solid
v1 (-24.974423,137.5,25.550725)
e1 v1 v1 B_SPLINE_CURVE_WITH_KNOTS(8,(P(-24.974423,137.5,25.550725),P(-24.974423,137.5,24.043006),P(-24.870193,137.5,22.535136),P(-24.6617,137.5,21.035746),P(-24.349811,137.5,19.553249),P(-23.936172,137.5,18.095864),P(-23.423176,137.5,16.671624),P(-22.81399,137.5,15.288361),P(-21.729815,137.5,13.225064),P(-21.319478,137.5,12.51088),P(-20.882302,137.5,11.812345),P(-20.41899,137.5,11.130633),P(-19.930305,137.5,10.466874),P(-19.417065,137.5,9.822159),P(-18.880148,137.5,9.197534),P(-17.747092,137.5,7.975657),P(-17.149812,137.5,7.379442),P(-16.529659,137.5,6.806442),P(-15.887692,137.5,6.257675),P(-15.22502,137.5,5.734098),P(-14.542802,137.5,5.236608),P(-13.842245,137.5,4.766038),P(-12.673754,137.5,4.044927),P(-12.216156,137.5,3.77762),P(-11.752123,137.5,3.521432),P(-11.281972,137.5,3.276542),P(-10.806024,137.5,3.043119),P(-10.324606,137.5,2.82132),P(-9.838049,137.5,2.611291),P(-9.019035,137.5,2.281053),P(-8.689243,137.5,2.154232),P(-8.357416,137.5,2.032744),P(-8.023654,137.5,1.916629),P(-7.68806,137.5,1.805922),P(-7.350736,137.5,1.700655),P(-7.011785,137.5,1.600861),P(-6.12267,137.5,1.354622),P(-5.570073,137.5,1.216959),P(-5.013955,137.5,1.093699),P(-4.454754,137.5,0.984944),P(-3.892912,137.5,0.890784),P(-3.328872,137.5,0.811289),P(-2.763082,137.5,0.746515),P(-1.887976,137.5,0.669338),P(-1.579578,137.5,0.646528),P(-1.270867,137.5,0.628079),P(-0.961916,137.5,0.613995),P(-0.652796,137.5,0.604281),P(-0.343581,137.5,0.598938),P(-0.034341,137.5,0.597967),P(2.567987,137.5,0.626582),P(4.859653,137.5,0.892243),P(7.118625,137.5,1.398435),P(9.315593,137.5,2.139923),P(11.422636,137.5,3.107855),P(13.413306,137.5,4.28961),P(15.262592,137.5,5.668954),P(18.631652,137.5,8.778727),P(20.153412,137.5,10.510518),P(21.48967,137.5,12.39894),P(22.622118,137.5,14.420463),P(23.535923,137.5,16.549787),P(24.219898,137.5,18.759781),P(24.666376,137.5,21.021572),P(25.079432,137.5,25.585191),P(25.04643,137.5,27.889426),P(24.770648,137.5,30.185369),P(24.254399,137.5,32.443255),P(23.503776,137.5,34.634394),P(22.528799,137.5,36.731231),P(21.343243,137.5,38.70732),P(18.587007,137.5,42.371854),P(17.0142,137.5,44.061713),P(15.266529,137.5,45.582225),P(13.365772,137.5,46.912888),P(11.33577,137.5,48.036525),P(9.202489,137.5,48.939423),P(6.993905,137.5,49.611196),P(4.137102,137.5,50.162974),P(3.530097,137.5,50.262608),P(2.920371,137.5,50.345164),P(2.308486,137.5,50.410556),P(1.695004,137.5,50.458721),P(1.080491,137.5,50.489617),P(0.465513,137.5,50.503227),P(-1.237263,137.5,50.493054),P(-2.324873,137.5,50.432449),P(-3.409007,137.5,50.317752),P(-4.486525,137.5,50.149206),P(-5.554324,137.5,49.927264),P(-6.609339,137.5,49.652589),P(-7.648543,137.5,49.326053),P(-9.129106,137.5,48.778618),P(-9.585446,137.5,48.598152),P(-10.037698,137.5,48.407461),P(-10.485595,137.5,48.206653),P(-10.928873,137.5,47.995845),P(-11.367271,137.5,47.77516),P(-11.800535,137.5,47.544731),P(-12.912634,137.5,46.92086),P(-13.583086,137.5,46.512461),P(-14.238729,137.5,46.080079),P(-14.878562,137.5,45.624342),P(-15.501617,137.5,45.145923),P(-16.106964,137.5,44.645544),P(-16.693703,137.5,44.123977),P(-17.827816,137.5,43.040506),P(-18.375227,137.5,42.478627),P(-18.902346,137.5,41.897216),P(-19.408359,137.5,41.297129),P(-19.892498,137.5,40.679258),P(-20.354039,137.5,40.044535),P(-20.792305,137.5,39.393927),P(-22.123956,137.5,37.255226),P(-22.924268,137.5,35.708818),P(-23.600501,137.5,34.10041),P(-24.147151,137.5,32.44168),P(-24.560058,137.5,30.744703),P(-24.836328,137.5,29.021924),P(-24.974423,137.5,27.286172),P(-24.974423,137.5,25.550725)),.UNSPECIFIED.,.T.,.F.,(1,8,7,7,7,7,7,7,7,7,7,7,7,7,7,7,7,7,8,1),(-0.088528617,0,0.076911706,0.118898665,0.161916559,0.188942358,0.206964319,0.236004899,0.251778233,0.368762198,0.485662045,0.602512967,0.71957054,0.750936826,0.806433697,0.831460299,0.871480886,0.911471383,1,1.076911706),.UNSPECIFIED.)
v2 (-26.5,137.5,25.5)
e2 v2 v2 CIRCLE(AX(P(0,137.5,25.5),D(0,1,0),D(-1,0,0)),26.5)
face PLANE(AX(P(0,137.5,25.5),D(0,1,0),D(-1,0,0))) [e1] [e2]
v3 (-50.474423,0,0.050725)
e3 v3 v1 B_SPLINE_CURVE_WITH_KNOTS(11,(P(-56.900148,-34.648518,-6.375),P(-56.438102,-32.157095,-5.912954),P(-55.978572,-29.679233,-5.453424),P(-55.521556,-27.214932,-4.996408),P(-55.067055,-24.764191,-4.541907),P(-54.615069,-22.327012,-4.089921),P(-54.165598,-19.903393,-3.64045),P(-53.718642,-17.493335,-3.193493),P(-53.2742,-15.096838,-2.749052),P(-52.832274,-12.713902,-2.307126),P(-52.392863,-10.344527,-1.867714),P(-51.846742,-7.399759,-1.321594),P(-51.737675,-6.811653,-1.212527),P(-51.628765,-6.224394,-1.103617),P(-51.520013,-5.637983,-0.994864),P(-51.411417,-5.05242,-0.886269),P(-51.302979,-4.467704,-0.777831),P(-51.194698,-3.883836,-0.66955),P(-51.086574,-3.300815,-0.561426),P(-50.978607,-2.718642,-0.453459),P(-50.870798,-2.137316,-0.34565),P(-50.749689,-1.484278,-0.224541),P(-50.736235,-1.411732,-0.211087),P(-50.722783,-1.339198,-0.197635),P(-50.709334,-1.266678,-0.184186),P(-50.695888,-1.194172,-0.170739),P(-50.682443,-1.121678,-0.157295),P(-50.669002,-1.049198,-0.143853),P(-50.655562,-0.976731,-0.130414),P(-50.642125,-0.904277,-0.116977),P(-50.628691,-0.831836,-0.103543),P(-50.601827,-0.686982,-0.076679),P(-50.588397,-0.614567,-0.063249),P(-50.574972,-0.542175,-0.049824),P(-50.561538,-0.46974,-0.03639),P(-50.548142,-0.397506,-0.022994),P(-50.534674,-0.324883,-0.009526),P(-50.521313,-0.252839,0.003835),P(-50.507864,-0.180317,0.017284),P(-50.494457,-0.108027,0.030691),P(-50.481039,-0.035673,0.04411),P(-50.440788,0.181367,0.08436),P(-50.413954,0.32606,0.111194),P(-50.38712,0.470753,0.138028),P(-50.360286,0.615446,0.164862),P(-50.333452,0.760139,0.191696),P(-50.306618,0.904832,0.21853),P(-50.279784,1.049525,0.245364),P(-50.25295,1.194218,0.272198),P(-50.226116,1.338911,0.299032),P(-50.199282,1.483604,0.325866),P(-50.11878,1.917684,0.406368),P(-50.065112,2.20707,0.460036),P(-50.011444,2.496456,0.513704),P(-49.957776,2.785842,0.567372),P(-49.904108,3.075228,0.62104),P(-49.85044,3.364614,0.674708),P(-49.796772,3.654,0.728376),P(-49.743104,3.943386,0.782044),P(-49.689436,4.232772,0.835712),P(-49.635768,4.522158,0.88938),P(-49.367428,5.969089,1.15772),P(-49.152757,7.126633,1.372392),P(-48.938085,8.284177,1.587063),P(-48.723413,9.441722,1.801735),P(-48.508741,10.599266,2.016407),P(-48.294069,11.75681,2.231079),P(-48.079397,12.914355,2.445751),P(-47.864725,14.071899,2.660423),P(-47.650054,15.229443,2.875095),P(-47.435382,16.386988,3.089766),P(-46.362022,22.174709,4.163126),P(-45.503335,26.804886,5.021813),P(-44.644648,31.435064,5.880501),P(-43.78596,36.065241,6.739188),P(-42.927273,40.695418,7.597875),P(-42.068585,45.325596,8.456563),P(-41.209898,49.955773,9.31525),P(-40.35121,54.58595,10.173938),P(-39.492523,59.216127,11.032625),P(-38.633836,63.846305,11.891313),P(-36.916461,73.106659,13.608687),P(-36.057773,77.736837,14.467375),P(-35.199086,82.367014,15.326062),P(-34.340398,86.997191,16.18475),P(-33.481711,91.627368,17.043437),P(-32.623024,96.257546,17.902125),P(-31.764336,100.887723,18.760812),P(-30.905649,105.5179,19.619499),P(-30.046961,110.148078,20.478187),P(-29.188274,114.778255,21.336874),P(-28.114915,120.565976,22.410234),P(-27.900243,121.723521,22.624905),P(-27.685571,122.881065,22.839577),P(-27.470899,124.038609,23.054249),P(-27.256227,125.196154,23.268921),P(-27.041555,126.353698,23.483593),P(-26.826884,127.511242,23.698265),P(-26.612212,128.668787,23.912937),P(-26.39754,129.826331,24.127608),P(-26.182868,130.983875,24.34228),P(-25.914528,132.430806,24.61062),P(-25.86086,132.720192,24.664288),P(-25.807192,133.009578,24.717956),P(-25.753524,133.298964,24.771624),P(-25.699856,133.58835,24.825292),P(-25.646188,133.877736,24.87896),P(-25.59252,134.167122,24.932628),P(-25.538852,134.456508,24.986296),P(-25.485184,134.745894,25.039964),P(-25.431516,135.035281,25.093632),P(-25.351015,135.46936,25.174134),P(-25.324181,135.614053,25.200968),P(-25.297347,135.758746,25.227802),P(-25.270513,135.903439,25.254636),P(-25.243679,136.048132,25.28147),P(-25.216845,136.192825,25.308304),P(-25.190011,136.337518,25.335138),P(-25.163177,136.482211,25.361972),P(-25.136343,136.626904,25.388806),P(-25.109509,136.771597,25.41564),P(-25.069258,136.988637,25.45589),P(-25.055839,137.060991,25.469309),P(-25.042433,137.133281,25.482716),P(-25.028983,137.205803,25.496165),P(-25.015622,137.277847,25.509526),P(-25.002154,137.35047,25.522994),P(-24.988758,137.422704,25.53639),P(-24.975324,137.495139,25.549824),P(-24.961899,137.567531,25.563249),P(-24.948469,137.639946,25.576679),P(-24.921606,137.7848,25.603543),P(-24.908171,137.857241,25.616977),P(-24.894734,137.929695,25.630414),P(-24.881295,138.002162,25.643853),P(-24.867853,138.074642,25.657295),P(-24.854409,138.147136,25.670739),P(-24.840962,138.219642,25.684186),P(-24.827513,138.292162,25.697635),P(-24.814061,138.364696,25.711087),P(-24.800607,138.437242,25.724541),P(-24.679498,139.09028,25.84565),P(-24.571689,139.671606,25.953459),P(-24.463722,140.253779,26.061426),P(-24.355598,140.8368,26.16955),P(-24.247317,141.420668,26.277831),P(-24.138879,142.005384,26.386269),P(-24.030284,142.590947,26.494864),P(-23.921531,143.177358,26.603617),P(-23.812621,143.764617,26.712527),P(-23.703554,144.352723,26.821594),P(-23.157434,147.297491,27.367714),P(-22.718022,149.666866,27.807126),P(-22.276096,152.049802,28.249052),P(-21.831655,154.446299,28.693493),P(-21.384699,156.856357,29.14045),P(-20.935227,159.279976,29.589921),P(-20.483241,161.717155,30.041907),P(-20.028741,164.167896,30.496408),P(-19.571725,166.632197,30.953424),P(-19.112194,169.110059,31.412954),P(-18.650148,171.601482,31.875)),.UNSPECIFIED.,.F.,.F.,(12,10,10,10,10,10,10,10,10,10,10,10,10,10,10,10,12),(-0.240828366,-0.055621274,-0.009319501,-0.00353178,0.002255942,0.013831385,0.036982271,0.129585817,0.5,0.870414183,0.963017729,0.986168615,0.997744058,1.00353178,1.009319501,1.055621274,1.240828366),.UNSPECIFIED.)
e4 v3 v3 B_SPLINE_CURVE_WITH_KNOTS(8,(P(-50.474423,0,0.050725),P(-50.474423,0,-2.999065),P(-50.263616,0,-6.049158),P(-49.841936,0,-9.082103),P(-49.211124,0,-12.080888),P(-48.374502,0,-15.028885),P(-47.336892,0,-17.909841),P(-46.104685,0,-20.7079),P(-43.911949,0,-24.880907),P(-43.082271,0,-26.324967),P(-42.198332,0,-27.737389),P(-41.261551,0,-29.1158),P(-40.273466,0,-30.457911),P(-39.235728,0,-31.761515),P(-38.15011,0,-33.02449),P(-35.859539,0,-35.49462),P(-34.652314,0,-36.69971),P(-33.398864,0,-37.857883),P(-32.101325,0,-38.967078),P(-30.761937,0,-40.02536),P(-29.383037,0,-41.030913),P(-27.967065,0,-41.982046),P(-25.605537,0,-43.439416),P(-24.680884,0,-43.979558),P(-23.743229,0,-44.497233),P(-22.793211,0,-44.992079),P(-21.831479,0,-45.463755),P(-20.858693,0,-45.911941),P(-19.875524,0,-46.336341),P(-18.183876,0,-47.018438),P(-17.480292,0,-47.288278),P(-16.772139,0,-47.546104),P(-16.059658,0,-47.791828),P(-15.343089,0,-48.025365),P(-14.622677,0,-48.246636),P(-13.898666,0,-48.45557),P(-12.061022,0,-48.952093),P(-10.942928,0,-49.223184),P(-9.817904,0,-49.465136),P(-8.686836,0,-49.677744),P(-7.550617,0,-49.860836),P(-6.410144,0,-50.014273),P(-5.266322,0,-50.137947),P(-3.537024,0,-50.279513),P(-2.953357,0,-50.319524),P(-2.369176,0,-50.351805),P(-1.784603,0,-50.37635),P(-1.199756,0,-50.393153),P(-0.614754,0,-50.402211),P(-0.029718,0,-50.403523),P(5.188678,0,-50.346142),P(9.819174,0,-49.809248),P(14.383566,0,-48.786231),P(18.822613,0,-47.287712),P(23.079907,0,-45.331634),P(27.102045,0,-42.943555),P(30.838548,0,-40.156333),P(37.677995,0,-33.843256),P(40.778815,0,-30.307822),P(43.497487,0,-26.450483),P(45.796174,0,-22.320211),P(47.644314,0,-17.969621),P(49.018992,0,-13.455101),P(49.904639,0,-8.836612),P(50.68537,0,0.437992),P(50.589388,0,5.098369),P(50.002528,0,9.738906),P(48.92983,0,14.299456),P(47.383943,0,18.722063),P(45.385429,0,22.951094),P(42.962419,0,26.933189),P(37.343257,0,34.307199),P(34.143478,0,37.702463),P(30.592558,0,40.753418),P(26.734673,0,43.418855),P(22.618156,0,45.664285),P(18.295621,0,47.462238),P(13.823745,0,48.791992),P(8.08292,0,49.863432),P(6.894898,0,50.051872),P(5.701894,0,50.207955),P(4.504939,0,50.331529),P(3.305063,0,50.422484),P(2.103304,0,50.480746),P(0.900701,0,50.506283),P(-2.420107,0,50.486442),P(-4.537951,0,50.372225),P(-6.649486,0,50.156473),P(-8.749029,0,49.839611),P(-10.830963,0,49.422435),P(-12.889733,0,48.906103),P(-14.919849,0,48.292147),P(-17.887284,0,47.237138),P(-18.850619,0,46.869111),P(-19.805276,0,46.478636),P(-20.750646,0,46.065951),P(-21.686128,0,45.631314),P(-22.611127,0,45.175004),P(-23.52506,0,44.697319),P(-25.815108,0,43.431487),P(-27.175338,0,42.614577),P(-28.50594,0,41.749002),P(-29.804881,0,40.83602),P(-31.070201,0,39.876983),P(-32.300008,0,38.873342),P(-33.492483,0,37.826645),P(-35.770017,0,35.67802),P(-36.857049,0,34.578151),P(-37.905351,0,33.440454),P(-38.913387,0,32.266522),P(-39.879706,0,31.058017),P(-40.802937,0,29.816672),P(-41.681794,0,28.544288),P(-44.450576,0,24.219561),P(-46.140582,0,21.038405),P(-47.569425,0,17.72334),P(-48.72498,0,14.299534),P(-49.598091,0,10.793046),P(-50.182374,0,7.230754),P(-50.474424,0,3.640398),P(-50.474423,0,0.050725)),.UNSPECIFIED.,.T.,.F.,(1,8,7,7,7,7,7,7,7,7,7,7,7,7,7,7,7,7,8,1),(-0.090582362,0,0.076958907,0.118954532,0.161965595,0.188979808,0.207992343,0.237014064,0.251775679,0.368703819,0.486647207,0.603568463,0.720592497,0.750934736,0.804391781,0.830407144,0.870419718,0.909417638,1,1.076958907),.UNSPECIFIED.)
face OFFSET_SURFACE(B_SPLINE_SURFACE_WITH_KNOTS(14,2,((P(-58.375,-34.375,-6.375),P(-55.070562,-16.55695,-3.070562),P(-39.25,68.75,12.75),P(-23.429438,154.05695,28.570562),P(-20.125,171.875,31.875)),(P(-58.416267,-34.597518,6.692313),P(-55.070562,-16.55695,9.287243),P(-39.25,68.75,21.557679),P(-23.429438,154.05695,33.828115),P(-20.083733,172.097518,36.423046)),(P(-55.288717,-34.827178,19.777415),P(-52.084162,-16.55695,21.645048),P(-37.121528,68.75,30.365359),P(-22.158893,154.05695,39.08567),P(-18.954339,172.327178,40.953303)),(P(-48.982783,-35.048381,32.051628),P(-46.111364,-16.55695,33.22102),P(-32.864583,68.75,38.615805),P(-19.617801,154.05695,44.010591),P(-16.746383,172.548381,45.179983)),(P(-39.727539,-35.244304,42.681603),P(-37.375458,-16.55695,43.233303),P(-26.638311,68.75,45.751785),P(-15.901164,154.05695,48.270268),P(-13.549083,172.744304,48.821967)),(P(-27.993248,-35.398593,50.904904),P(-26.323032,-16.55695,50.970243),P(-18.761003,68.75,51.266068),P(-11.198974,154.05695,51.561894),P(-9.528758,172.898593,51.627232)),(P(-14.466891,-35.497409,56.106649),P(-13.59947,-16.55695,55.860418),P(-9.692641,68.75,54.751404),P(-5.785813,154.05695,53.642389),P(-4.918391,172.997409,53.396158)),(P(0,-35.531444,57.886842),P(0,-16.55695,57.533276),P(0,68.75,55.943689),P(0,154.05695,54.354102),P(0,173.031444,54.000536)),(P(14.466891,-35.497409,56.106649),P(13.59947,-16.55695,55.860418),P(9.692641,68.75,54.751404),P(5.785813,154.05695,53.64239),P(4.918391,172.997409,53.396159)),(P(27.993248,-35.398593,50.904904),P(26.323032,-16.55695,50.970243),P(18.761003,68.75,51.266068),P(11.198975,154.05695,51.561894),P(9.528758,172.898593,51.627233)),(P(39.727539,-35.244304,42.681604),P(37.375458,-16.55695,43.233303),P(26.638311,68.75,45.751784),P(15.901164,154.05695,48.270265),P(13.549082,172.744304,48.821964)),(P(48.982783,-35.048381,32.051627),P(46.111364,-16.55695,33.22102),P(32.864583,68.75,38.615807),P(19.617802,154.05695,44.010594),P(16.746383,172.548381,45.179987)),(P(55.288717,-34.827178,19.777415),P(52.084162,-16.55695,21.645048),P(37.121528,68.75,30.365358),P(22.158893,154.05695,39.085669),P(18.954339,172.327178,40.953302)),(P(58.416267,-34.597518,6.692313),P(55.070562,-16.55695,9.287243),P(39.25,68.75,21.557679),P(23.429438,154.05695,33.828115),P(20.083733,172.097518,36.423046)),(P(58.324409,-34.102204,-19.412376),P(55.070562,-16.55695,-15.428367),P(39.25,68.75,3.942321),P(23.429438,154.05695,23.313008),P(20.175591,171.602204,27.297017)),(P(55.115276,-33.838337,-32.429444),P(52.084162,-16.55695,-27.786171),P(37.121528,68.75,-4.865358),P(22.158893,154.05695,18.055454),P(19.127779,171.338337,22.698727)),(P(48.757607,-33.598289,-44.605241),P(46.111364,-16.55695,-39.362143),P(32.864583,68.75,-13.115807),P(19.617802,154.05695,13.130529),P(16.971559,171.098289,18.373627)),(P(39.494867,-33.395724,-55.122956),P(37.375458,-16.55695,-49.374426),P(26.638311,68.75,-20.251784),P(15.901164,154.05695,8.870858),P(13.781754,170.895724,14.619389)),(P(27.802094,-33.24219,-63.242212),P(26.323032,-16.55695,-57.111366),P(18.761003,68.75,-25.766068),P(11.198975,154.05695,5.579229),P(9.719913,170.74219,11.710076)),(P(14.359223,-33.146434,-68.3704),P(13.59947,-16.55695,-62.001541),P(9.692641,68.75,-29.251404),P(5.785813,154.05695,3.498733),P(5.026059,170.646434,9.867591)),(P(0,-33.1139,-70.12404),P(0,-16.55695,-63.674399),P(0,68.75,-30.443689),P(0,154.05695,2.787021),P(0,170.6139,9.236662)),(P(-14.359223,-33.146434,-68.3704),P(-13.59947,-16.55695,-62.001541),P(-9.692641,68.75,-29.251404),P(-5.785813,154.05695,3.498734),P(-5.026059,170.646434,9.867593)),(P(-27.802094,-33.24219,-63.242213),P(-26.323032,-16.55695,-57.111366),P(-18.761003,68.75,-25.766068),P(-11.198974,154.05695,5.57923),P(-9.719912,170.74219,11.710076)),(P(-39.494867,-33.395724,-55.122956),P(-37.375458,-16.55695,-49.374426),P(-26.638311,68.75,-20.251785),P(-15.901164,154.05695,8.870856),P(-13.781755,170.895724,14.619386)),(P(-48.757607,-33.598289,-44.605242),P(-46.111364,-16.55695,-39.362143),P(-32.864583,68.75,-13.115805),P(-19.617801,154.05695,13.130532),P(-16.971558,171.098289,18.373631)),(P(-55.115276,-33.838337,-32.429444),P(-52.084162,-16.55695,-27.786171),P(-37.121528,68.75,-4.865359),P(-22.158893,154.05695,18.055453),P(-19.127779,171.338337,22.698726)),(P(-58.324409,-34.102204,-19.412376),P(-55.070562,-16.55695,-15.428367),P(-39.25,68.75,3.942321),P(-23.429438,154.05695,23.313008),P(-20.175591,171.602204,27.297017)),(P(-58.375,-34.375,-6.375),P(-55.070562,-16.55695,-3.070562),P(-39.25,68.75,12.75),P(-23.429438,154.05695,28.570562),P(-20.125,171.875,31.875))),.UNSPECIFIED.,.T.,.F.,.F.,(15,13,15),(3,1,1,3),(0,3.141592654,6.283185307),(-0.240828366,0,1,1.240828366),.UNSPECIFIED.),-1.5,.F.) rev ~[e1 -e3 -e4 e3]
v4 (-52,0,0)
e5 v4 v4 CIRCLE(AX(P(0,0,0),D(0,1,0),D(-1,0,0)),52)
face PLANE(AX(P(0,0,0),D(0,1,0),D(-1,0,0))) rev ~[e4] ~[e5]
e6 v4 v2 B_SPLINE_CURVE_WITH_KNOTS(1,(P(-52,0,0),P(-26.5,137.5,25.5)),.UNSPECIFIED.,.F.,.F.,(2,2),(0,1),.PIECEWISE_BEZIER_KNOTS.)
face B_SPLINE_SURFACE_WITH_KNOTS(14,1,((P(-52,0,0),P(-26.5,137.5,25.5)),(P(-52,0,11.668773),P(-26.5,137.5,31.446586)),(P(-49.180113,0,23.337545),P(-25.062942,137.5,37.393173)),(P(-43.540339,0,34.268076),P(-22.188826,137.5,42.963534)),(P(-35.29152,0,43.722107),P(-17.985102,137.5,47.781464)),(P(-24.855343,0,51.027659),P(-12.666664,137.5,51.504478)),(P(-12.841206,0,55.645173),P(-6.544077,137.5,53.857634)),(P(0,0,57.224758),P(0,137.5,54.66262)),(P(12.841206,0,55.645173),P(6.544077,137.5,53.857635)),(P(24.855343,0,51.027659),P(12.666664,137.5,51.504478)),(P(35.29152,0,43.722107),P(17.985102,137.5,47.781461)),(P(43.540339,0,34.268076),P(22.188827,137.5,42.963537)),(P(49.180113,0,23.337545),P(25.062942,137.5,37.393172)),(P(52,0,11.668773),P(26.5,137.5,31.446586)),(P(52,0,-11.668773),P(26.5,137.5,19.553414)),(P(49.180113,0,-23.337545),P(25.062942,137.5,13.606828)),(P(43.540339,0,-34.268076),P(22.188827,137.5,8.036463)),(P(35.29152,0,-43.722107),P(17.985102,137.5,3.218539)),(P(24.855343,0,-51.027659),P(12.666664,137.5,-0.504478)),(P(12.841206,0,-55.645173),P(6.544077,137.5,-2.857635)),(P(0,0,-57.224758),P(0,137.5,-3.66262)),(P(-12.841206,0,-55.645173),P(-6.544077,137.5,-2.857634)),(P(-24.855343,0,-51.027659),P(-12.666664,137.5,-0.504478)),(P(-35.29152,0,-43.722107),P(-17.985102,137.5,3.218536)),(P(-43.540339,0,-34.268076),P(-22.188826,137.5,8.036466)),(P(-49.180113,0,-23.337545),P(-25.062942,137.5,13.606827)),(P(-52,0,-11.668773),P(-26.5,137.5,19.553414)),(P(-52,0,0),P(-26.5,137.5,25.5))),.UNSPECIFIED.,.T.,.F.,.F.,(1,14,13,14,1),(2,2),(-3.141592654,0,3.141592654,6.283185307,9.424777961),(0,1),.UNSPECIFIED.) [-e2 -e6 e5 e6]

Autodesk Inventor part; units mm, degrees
ref_plane "YZ Plane" through (0, 0, 0) normal (1, 0, 0) x (0, 1, 0)
ref_plane "XY Plane" through (0, 0, 0) normal (0, 0, 1) x (1, 0, 0)
sketch "Szkic6" plane through (0, 0, 0) normal (0, 1, 0) x (-1, 0, 0)
  circle A0 centre (0, 0) radius 52
  dimension "d33" = 104
ref_plane "Płaszczyzna konstrukcyjna1" through (0, 137.5, 0) normal (0, 1, 0) x (-1, 0, 0)
sketch "Szkic7" plane through (0, 137.5, 0) normal (0, 1, 0) x (-1, 0, 0)
  circle A0 centre (0, 25.5) radius 26.5
  line L0 (0, -20.3) -> (0, 20.3) construction
  circle A1 centre (0, 0) radius 52 construction
  dimension "d35" = 53
loft "Wyciągnięcie złożone1" add profiles "Szkic6", "Szkic7"
shell "Skorupa1" thickness 1.5 removed faces 2 at (-1.8199, 137.5, 22.9501) at (-18.5271, 0, 25.061)
equation "\"d33\" = OD1"
equation "\"d35\" = OD2"
equation "\"d52\" = THK"
equation "\"SzerokośćGięciaPodcięcia\" = Grubość"
equation "\"RozmiarPodcięciaNarożnika\" = 4 * Grubość"
equation "\"PromieńPrzejścia\" = PromieńGięcia"
equation "\"Rozmiar_promienia_Jacobiego\" = PromieńGięcia"
equation "\"Wielk_odstępu\" = Grubość"
equation "\"d2\" = PromieńGięcia"
equation "\"d23\" = PromieńGięcia"
equation "\"OD1\" = 104"
equation "\"OD2\" = 53"
equation "\"L\" = 137.5"
equation "\"THK\" = 1.5"
equation "\"d34\" = L"
equation "\"Grubość\" = 1.5"
equation "\"PromieńGięcia\" = 3"
properties part number "Redukcja asymetryczna Ø104x53x1,5 L=137,5" material "304"
